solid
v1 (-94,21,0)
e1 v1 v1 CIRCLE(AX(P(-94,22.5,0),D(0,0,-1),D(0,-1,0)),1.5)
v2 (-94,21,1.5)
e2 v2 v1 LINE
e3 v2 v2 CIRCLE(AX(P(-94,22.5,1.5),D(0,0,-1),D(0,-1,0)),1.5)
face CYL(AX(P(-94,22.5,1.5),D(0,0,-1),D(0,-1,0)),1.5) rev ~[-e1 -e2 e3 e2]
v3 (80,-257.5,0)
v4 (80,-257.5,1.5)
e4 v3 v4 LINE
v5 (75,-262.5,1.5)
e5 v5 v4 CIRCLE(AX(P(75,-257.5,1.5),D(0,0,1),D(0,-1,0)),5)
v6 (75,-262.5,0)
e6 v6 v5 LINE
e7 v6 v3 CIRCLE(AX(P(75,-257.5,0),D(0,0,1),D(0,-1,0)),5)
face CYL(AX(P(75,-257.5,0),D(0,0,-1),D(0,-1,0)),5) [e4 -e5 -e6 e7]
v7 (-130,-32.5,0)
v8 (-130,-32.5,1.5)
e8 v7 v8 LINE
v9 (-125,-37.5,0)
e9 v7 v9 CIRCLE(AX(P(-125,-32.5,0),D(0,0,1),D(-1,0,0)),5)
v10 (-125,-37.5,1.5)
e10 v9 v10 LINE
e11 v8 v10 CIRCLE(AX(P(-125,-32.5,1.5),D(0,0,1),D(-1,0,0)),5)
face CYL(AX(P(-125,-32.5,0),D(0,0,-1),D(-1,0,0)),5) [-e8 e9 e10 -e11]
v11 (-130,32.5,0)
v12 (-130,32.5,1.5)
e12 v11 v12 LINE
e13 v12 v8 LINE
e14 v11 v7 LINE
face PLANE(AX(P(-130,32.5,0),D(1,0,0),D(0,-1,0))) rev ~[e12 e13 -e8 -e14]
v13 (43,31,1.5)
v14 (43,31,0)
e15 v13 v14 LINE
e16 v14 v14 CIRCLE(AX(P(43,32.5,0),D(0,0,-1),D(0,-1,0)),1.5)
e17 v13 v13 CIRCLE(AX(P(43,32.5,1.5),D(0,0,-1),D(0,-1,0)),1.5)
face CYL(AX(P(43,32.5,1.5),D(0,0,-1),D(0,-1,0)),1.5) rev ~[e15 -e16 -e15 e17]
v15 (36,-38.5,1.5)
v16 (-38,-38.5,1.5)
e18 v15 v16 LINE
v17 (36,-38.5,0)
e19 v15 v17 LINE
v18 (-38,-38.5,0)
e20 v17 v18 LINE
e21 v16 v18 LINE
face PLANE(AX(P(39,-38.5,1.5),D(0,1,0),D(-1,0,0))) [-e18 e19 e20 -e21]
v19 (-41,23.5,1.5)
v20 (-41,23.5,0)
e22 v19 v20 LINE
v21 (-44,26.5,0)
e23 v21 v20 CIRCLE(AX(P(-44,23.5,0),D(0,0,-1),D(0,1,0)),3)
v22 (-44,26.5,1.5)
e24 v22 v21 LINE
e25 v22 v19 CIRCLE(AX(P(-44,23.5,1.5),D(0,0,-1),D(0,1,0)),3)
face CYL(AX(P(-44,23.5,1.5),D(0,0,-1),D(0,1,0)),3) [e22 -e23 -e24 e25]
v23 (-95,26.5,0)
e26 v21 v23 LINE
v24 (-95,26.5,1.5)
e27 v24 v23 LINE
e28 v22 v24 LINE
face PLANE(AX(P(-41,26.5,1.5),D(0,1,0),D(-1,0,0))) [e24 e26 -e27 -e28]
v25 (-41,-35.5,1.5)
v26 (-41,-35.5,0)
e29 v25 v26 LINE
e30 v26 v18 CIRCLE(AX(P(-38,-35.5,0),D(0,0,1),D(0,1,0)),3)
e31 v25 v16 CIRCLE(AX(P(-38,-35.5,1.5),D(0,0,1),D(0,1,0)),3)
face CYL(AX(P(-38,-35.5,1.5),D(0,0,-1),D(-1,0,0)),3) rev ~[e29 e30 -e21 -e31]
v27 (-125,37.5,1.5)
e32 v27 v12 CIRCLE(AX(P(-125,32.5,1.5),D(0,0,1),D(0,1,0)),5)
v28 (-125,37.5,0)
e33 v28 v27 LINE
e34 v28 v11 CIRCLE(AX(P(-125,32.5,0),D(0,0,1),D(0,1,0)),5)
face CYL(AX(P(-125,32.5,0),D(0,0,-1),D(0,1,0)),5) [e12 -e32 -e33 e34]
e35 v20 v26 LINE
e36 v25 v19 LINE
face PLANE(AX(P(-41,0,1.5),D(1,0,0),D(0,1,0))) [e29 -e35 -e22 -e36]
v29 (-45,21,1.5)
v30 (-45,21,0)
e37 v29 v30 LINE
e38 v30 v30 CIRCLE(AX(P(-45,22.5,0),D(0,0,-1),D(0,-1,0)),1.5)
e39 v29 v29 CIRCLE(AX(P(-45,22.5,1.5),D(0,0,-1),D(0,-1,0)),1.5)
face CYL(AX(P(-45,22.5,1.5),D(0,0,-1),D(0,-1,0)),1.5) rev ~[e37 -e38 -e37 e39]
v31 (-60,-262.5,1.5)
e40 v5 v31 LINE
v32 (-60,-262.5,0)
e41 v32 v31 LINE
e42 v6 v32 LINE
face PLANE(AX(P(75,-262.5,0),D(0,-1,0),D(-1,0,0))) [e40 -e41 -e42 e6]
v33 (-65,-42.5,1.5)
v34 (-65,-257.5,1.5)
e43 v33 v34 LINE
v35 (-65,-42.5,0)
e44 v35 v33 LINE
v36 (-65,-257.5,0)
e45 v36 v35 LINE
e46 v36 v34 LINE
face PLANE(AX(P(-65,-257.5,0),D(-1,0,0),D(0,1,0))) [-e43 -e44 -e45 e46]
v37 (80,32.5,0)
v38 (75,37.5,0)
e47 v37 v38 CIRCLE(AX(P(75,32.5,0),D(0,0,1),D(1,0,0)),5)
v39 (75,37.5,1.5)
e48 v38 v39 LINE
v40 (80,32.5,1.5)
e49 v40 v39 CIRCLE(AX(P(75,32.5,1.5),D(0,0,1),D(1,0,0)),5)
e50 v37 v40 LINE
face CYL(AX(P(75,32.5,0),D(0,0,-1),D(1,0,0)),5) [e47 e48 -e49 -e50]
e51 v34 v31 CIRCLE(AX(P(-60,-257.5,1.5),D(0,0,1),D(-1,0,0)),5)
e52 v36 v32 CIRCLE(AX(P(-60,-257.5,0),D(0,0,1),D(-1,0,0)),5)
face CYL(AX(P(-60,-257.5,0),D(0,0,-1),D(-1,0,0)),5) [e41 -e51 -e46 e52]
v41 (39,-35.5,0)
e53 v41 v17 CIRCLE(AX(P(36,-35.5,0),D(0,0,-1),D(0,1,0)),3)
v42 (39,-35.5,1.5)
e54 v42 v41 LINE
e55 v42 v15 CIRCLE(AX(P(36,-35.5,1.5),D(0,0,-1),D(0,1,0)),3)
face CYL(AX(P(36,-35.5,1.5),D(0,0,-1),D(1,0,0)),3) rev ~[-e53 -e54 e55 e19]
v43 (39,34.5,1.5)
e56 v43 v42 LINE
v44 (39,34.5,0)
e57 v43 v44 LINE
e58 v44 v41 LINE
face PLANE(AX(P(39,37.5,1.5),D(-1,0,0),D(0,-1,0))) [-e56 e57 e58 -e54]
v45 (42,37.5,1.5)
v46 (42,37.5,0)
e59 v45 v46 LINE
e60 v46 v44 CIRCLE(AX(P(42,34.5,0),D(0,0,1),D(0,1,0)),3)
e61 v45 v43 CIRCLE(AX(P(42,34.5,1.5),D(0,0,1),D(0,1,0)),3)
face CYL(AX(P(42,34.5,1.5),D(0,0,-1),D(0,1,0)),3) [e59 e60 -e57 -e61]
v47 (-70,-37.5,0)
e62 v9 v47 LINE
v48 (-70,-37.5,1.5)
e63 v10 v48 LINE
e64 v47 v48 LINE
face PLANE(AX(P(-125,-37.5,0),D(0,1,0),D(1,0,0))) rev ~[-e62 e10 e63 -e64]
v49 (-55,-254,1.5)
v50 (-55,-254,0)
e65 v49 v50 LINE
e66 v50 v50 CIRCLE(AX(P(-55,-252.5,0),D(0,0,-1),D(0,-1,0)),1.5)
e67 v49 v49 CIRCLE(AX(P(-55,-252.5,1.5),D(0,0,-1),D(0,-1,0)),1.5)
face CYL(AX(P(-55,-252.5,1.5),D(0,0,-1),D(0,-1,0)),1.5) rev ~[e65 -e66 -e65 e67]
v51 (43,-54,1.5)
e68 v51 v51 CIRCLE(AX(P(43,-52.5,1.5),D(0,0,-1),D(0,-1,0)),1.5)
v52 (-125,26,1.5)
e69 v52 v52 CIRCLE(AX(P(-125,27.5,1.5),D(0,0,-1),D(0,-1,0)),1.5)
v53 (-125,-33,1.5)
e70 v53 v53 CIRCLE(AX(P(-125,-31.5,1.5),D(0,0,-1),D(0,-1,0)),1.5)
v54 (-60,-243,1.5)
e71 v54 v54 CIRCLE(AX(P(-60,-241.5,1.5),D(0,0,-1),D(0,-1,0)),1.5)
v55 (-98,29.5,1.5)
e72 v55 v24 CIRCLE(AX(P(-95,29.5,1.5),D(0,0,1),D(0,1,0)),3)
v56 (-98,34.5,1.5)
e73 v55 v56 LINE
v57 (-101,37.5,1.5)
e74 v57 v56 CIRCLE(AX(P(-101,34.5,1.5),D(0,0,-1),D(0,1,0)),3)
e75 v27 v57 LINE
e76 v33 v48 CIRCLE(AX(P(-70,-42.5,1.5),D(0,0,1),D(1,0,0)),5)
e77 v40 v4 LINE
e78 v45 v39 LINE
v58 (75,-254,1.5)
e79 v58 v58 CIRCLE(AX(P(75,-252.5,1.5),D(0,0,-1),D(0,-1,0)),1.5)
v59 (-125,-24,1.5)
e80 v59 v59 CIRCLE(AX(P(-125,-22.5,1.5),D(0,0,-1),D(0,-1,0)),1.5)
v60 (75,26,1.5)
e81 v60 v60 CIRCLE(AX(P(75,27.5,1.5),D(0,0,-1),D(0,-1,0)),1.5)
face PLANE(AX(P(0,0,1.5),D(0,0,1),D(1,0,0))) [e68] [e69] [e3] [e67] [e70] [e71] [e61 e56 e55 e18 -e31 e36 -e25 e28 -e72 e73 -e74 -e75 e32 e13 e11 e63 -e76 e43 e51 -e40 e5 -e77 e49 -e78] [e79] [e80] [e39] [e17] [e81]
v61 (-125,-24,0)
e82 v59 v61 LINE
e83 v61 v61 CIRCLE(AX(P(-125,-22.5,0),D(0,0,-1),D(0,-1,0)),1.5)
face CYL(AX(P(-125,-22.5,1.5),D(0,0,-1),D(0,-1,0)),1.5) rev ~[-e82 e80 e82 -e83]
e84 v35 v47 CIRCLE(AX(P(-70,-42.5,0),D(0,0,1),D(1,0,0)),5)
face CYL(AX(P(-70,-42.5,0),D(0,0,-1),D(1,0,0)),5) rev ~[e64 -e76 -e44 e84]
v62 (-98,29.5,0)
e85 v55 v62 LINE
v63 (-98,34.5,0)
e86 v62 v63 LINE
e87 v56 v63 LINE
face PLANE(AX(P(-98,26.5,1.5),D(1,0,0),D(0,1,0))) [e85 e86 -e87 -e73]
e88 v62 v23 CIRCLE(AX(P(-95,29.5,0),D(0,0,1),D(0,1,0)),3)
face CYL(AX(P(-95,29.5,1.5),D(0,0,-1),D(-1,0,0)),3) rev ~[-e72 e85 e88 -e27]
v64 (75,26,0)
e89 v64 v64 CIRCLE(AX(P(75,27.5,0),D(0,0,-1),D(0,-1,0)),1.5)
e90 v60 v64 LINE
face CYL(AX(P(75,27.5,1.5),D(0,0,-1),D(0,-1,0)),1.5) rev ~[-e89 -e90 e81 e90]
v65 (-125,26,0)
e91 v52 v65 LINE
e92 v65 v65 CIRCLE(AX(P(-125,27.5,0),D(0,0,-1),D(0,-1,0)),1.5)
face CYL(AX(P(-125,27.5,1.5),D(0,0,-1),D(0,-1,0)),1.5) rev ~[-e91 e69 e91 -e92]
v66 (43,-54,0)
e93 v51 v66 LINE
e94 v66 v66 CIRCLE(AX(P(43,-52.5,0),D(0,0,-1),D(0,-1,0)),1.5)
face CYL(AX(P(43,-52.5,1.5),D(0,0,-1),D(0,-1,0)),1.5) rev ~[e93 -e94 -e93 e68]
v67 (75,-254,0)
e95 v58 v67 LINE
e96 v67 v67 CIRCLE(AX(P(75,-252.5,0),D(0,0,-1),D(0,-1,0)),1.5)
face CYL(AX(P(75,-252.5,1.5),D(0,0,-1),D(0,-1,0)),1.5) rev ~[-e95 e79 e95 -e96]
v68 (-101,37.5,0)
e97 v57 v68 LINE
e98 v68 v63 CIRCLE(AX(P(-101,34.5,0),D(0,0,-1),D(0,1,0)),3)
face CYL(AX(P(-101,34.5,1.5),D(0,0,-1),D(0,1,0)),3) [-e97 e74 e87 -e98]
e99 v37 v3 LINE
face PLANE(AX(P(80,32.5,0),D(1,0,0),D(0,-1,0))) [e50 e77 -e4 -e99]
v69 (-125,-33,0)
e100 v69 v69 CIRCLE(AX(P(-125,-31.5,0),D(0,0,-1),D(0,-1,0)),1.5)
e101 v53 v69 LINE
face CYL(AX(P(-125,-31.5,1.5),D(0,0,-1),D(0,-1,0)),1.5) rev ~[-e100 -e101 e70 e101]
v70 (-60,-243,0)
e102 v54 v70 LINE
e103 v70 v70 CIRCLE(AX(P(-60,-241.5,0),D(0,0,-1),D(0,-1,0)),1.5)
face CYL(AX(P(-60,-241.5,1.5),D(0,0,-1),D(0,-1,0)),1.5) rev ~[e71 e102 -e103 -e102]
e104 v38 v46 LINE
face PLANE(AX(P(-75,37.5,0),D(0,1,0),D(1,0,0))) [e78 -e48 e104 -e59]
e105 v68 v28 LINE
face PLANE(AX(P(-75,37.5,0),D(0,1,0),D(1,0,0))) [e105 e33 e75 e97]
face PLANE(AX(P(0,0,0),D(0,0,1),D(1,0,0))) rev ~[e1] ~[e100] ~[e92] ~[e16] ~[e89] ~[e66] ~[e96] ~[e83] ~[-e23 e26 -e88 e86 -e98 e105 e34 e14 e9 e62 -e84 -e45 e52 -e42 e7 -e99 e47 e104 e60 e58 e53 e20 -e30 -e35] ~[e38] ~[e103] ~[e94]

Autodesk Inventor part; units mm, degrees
ref_plane "YZ Plane" through (0, 0, 0) normal (1, 0, 0) x (0, 1, 0)
ref_plane "XZ Plane" through (0, 0, 0) normal (0, 1, 0) x (-1, 0, 0)
ref_plane "XY Plane" through (0, 0, 0) normal (0, 0, 1) x (1, 0, 0)
sketch "スケッチ2" plane through (0, 0, 0) normal (0, 0, 1) x (1, 0, 0)
  line L0 (-75, 37.5) -> (75, 37.5)
  line L1 (80, 32.5) -> (80, -257.5)
  line L2 (75, -262.5) -> (-60, -262.5)
  line L3 (-65, -183.2657) -> (-65, -42.5)
  arc A0 (80, 32.5) -> (75, 37.5) centre (75, 32.5) ccw
  arc A1 (75, -262.5) -> (80, -257.5) centre (75, -257.5) ccw
  line L4 (-65, -257.5) -> (-65, -183.1423)
  arc A2 (-65, -257.5) -> (-60, -262.5) centre (-60, -257.5) ccw
  line L5 (-75, 37.5) -> (-125, 37.5)
  line L6 (-130, 32.5) -> (-130, -32.5)
  line L7 (-125, -37.5) -> (-70, -37.5)
  arc A3 (-125, 37.5) -> (-130, 32.5) centre (-125, 32.5) ccw
  arc A4 (-130, -32.5) -> (-125, -37.5) centre (-125, -32.5) ccw
  arc A5 (-65, -42.5) -> (-70, -37.5) centre (-70, -42.5) ccw
  point P0 (0, 0)
  point P1 (-75, 37.5)
  point P2 (80, -262.5)
  point P3 (80, 37.5)
  point P4 (-65, -262.5)
  point P5 (-75, 0)
  point P6 (0, 37.5)
  point P7 (0, 0)
  point P8 (-130, 0)
  dimension "d1" = 300
  dimension "d24" = 5
  dimension "d49" = 210
  dimension "d50" = 5
  dimension "d51" = 75
  dimension "d78" = 145
extrude "押し出し1" add sketch "スケッチ2" along normal blind 1.5
sketch "スケッチ5" plane through (0, 0, 1.5) normal (0, 0, 1) x (1, 0, 0)
  line L0 (75, 37.5) -> (-125, 37.5) projected
  line L1 (80, -257.5) -> (80, 32.5) projected
  line L2 (-60, -262.5) -> (75, -262.5) projected
  line L3 (-130, 32.5) -> (-130, -32.5) projected
  line L4 (-125, -37.5) -> (-70, -37.5) projected
  line L5 (-65, -42.5) -> (-65, -257.5) projected
  point P0 (-125, 27.5)
  point P1 (75, 27.5)
  point P2 (75, -252.5)
  point P3 (-70, 37.5)
  point P4 (-125, -31.5)
  point P5 (-60, -241.5)
  point P6 (43, -52.5)
  point P7 (43, 32.5)
  point P8 (-45, 22.5)
  point P9 (-125, -22.5)
  point P10 (-55, -252.5)
  point P11 (-94, 22.5)
  dimension "d25" = 10
  dimension "d27" = 5
  dimension "d44" = 80
  dimension "d46" = 85
  dimension "d52" = 5
  dimension "d55" = 10
  dimension "d56" = 10
  dimension "d58" = 21
  dimension "d59" = 5
  dimension "d60" = 15
  dimension "d61" = 69
  dimension "d62" = 5
  dimension "d66" = 54
  dimension "d67" = 49
  dimension "d77" = 37
hole "穴3" at (-125, 27.5, 1.5) at (75, 27.5, 1.5) at (75, -252.5, 1.5) at (-125, -31.5, 1.5) at (-60, -241.5, 1.5) at (-45, 22.5, 1.5) at (43, 32.5, 1.5) at (43, -52.5, 1.5) at (-125, -22.5, 1.5) at (-55, -252.5, 1.5) at (-94, 22.5, 1.5) direction (0, 0, -1) diameter 3 depth 8.1 tip angle 118
sketch "スケッチ6" plane through (0, 0, 1.5) normal (0, 0, 1) x (1, 0, 0)
  point P0 (0, 0)
sketch "スケッチ7" plane through (0, 0, 1.5) normal (0, 0, 1) x (1, 0, 0)
  line L0 (-41, 26.5) -> (-98, 26.5)
  line L1 (-98, 26.5) -> (-98, 37.5)
  line L2 (-98, 37.5) -> (39, 37.5)
  line L3 (39, 37.5) -> (39, -38.5)
  line L4 (-41, 0) -> (-41, 26.5)
  circle A0 centre (-45, 22.5) radius 1.5 projected
  circle A1 centre (-94, 22.5) radius 1.5 projected
  line L5 (75, 37.5) -> (-125, 37.5) projected
  line L6 (39, -38.5) -> (-41, -38.5)
  line L7 (-41, -38.5) -> (-41, 0)
  point P0 (-25.5, 0)
  dimension "d68" = 4
  dimension "d69" = 4
  dimension "d70" = 4
  dimension "d74" = 76
  dimension "d75" = 80
extrude "押し出し2" cut sketch "スケッチ7" against normal blind 10 contours L0 L1 L2 L3 L6 L7 L4
fillet "フィレット1" radius 3 6 edges at (-98, 26.5, 0.75) (-41, 26.5, 0.75) (-98, 37.5, 0.75) (-41, -38.5, 0.75) (39, -38.5, 0.75) (39, 37.5, 0.75)
properties part number "天板"
